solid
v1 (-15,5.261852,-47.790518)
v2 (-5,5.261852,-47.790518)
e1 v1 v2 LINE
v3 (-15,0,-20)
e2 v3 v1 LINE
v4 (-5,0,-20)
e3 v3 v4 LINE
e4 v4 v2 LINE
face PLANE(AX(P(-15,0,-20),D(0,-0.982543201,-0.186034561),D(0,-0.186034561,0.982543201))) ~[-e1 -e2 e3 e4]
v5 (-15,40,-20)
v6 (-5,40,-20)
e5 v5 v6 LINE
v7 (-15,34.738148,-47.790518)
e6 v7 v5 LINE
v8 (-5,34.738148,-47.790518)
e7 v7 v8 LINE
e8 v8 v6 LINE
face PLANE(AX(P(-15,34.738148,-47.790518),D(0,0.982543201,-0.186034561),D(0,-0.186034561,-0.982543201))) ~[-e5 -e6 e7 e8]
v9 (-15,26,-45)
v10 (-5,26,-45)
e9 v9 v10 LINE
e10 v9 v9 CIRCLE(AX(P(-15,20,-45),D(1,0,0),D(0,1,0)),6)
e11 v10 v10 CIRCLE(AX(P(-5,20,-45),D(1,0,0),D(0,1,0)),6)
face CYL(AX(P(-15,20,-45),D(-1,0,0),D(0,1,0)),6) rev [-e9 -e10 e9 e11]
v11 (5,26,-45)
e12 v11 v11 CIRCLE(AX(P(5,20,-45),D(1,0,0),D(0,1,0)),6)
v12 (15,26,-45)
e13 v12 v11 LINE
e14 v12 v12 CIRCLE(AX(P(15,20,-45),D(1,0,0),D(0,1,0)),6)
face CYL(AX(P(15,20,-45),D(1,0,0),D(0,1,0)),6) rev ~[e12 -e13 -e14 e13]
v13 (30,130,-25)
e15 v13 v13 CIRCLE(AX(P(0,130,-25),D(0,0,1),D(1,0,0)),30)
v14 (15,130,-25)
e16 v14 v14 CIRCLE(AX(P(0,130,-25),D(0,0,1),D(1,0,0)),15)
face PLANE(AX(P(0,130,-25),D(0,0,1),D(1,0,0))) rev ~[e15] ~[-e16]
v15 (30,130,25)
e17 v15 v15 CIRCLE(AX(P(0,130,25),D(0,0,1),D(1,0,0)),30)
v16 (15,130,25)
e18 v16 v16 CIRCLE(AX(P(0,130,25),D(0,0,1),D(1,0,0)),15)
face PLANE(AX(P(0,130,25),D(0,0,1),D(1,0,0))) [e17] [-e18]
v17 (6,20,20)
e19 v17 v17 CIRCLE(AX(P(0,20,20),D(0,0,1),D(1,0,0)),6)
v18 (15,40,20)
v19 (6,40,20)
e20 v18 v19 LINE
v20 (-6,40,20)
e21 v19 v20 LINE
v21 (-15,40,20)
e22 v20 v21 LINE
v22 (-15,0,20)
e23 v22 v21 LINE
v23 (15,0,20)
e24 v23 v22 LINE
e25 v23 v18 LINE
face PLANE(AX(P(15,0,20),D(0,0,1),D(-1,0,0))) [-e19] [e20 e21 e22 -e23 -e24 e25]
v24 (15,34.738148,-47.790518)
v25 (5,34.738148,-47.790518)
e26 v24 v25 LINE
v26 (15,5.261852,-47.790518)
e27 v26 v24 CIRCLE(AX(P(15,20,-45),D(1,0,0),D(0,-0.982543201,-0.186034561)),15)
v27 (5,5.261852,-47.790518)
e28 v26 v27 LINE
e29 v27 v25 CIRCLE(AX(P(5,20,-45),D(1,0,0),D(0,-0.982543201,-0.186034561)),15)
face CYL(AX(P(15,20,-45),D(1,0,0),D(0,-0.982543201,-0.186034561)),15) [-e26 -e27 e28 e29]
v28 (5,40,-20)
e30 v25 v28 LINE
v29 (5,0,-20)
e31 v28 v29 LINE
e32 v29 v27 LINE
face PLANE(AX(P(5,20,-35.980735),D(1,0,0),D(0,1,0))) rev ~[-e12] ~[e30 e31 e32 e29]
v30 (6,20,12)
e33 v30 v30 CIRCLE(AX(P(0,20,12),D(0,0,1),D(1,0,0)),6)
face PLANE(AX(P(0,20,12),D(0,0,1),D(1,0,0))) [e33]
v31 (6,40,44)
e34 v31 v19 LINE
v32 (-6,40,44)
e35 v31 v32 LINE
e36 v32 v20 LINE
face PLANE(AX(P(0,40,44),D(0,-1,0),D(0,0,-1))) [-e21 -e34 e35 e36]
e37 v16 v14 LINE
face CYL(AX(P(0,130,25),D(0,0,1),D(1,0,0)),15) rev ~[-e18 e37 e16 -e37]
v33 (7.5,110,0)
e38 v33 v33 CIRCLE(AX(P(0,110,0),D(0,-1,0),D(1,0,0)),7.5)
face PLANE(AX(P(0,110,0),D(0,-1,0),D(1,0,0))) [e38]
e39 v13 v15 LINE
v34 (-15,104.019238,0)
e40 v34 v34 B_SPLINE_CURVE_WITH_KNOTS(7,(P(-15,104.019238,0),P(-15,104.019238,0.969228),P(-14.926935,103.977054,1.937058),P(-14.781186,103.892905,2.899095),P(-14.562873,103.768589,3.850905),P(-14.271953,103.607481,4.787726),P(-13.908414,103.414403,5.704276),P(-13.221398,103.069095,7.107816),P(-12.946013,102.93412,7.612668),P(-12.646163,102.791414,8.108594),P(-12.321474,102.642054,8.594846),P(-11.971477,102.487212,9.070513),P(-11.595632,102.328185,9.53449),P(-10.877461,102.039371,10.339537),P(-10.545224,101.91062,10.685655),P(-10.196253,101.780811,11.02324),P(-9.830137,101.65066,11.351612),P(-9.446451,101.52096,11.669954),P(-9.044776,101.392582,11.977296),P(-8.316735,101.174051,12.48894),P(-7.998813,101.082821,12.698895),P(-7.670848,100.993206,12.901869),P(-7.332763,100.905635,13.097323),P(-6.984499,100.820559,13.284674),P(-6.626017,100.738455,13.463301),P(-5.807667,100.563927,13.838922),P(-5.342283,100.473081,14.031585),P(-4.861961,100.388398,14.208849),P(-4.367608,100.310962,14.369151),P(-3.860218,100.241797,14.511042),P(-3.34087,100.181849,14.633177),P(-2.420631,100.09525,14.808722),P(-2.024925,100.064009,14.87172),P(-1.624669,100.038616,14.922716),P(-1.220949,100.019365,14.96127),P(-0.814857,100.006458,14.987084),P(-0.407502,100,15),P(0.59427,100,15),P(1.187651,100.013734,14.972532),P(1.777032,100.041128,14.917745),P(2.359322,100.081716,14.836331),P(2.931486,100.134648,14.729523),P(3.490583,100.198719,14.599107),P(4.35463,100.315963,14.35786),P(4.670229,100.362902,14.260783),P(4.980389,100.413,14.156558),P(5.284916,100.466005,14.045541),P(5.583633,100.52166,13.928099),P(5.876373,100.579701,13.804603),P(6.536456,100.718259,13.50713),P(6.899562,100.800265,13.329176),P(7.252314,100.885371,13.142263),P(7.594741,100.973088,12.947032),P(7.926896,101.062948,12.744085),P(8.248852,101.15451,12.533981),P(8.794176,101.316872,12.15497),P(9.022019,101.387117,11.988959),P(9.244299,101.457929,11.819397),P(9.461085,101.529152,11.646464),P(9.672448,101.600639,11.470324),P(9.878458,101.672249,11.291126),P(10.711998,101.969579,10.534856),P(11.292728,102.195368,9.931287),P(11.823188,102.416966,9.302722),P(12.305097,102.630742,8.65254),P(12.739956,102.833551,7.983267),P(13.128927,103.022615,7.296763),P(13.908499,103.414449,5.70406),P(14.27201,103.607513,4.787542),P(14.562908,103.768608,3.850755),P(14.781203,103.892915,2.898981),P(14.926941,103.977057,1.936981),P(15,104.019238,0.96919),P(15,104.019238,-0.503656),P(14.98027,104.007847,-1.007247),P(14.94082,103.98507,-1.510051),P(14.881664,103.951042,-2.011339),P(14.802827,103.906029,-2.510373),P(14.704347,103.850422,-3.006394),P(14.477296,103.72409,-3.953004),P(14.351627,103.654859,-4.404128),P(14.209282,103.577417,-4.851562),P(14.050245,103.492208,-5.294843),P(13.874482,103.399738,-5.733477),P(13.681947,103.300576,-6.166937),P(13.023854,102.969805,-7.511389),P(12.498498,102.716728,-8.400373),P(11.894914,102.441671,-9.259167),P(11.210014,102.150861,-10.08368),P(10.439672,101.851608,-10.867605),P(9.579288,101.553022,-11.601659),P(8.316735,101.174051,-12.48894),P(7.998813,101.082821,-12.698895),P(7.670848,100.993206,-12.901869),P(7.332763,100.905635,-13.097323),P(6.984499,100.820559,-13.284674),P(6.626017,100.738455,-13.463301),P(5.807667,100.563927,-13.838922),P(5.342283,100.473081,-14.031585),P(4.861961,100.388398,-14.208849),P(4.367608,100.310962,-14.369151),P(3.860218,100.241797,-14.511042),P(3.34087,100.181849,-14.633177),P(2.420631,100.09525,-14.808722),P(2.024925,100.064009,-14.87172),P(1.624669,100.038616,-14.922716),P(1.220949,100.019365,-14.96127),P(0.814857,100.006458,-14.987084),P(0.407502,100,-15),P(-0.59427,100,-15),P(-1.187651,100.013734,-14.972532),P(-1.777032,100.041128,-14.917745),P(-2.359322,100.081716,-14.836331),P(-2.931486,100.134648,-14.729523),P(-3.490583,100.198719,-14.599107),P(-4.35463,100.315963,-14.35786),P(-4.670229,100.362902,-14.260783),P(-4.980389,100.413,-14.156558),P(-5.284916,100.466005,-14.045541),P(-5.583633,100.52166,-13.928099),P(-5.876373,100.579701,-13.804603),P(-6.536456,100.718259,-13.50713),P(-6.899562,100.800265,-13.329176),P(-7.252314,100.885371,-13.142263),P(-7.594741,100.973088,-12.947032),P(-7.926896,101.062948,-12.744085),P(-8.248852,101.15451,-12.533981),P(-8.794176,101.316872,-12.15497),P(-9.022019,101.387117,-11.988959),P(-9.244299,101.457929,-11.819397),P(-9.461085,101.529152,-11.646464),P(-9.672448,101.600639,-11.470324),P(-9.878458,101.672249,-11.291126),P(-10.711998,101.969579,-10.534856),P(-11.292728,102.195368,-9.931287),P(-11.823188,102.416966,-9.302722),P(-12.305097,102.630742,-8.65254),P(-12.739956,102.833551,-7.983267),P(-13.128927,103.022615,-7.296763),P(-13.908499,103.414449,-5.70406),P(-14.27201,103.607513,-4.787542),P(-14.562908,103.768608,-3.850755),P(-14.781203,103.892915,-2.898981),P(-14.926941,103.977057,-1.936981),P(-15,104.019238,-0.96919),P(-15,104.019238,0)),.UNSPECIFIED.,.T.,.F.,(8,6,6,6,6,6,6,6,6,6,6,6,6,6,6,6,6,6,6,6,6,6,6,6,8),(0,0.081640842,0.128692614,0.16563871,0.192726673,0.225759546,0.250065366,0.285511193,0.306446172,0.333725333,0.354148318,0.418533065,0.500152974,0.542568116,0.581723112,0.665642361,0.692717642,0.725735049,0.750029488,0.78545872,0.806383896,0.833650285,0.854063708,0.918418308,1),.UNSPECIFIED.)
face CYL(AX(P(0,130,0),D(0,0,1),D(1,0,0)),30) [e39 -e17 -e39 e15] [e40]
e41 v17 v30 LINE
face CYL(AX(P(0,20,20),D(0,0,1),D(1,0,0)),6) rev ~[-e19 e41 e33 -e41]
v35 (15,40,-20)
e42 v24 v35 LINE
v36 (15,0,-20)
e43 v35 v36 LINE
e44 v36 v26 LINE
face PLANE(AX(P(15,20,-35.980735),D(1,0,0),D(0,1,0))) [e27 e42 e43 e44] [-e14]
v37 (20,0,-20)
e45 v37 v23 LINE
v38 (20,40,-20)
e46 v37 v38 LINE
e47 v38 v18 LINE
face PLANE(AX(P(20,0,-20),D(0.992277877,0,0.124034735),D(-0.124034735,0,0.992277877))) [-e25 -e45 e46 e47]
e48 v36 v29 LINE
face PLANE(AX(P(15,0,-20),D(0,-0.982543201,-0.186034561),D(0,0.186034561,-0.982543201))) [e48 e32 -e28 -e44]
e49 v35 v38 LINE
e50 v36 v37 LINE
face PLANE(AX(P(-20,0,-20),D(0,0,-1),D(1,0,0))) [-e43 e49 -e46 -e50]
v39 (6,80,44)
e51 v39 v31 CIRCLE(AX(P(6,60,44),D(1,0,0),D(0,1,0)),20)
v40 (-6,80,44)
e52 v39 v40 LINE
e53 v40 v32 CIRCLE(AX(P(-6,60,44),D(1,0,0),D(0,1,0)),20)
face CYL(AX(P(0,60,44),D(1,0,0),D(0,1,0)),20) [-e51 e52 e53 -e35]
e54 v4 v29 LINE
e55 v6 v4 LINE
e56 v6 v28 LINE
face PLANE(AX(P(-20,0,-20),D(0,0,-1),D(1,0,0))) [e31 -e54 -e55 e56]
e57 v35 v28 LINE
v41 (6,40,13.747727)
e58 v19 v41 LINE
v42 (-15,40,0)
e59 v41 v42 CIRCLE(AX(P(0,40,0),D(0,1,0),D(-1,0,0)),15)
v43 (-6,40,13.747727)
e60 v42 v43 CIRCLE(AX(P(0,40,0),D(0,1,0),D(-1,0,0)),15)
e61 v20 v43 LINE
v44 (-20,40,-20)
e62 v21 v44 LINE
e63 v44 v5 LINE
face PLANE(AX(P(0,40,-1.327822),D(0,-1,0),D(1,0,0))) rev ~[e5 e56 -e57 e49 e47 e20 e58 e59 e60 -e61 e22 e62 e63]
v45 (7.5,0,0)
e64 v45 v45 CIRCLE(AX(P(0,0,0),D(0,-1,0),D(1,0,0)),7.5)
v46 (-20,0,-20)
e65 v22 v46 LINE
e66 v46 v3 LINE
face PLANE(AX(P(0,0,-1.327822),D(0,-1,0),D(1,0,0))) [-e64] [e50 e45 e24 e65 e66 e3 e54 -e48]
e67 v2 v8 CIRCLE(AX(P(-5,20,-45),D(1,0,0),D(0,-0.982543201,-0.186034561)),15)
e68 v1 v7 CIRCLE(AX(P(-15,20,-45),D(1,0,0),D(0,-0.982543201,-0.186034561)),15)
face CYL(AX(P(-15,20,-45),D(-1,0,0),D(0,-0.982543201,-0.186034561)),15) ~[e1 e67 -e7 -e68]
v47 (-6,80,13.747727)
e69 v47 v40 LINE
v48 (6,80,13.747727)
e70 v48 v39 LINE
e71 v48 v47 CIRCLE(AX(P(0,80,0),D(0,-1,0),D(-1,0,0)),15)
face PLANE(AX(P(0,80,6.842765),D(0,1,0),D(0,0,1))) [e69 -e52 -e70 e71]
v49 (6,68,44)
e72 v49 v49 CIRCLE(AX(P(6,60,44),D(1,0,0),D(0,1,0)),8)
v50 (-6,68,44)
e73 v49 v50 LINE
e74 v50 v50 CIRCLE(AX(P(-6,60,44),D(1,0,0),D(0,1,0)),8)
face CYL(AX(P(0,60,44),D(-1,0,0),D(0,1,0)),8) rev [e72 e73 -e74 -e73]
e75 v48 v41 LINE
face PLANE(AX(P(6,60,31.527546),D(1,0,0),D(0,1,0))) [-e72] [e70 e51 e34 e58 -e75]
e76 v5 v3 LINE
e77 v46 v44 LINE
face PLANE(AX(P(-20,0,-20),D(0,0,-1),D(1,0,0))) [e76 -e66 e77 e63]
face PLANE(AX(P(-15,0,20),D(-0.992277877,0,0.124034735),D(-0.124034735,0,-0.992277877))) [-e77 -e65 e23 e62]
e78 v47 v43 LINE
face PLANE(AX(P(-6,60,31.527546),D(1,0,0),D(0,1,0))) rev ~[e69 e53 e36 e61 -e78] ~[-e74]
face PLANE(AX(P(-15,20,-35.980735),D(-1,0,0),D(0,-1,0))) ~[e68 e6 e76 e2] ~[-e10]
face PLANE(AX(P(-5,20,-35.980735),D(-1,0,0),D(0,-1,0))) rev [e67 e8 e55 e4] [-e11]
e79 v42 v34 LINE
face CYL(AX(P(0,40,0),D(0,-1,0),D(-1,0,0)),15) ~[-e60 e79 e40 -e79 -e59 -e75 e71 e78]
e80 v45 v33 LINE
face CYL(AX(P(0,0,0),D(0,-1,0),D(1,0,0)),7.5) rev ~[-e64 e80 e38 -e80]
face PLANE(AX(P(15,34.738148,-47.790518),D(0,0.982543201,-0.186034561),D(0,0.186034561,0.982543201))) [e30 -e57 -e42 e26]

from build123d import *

# Parameters (mm, degrees)
F1_DEPTH  = 40
F2_R      = 15
F3_DEPTH  = 90
F4_R      = 30
F5_DEPTH  = 25
F6_R      = 8
F7_DEPTH  = 6
F10_DEPTH = 10
F11_R     = 6
F12_DEPTH = 10
F13_R     = 15
F14_DEPTH = 85.001
F15_R     = 6
F16_DEPTH = 8
F17_R     = 7.5
F18_DEPTH = 110


# Not quite as in the source:
# - a pattern or mirror of a feature is missing from the dataset's text; its kind, count and spacing are read off the source's solid


with BuildPart() as f1:
    # F0 (on Front) → F1 (new body)
    with BuildSketch(Plane.XZ):
        Polygon((15, 20), (-15, 20), (-20, -20), (20, -20), align=None)
    extrude(amount=-F1_DEPTH)

    # F2 (on face) → F3 (join)
    with BuildSketch(Plane(origin=(0, 40, 0), x_dir=(-1, 0, 0), z_dir=(0, 1, 0))):
        Circle(F2_R)
    extrude(amount=F3_DEPTH)

    # F4 (on Top) → F5 (join, symmetric)
    with BuildSketch(Plane.XY):
        with Locations((0, 130)):
            Circle(F4_R)
    extrude(amount=F5_DEPTH, both=True)

    # F6 (on Right) → F7 (join, symmetric)
    with BuildSketch(Plane.YZ):
        with BuildLine():
            Line((40, 44), (40, 10.4397451505))
            Line((40, 10.4397451505), (40, 6.8427645601))
            Line((40, 6.8427645601), (80, 6.8427645601))
            Line((80, 6.8427645601), (80, 44))
            ThreePointArc((80, 44), (60, 64), (40, 44))
        make_face()
        with Locations((60, 44)):
            Circle(F6_R, mode=Mode.SUBTRACT)
    extrude(amount=F7_DEPTH, both=True)

    # F9 (on offset) → F10 (join)
    with BuildSketch(Plane.YZ.offset(15)):
        with BuildLine():
            Line((0, -20), (5.2618519826, -47.7905184139))
            ThreePointArc((5.2618519826, -47.7905184139), (20, -60), (34.7381480174, -47.7905184139))
            Line((34.7381480174, -47.7905184139), (40, -20))
            Line((40, -20), (0, -20))
        make_face()
    f10 = extrude(amount=-F10_DEPTH)

    # F10_copies: F10 across plane
    add(f10.mirror(Plane(origin=(0, 0, 0), x_dir=(0, 0, -1), z_dir=(-1, 0, 0))))

    # F11 (on face) → F12 (cut, through all)
    with BuildSketch(Plane.YZ.offset(15)):
        with Locations((20, -45)):
            Circle(F11_R)
    f12 = extrude(amount=-F12_DEPTH, mode=Mode.SUBTRACT)

    # F12_copies: F12 across plane
    add(f12.mirror(Plane(origin=(0, 0, 0), x_dir=(0, 0, -1), z_dir=(-1, 0, 0))), mode=Mode.SUBTRACT)

    # F13 (on face) → F14 (cut, through all)
    with BuildSketch(Plane.XY.offset(25)):
        with Locations((0, 130)):
            Circle(F13_R)
    extrude(amount=-F14_DEPTH, mode=Mode.SUBTRACT)

    # F15 (on face) → F16 (cut)
    with BuildSketch(Plane.XY.offset(20)):
        with Locations((0, 20)):
            Circle(F15_R)
    extrude(amount=-F16_DEPTH, mode=Mode.SUBTRACT)

    # F17 (on face) → F18 (cut)
    with BuildSketch(Plane.XZ):
        Circle(F17_R)
    extrude(amount=-F18_DEPTH, mode=Mode.SUBTRACT)


solid = f1.part
